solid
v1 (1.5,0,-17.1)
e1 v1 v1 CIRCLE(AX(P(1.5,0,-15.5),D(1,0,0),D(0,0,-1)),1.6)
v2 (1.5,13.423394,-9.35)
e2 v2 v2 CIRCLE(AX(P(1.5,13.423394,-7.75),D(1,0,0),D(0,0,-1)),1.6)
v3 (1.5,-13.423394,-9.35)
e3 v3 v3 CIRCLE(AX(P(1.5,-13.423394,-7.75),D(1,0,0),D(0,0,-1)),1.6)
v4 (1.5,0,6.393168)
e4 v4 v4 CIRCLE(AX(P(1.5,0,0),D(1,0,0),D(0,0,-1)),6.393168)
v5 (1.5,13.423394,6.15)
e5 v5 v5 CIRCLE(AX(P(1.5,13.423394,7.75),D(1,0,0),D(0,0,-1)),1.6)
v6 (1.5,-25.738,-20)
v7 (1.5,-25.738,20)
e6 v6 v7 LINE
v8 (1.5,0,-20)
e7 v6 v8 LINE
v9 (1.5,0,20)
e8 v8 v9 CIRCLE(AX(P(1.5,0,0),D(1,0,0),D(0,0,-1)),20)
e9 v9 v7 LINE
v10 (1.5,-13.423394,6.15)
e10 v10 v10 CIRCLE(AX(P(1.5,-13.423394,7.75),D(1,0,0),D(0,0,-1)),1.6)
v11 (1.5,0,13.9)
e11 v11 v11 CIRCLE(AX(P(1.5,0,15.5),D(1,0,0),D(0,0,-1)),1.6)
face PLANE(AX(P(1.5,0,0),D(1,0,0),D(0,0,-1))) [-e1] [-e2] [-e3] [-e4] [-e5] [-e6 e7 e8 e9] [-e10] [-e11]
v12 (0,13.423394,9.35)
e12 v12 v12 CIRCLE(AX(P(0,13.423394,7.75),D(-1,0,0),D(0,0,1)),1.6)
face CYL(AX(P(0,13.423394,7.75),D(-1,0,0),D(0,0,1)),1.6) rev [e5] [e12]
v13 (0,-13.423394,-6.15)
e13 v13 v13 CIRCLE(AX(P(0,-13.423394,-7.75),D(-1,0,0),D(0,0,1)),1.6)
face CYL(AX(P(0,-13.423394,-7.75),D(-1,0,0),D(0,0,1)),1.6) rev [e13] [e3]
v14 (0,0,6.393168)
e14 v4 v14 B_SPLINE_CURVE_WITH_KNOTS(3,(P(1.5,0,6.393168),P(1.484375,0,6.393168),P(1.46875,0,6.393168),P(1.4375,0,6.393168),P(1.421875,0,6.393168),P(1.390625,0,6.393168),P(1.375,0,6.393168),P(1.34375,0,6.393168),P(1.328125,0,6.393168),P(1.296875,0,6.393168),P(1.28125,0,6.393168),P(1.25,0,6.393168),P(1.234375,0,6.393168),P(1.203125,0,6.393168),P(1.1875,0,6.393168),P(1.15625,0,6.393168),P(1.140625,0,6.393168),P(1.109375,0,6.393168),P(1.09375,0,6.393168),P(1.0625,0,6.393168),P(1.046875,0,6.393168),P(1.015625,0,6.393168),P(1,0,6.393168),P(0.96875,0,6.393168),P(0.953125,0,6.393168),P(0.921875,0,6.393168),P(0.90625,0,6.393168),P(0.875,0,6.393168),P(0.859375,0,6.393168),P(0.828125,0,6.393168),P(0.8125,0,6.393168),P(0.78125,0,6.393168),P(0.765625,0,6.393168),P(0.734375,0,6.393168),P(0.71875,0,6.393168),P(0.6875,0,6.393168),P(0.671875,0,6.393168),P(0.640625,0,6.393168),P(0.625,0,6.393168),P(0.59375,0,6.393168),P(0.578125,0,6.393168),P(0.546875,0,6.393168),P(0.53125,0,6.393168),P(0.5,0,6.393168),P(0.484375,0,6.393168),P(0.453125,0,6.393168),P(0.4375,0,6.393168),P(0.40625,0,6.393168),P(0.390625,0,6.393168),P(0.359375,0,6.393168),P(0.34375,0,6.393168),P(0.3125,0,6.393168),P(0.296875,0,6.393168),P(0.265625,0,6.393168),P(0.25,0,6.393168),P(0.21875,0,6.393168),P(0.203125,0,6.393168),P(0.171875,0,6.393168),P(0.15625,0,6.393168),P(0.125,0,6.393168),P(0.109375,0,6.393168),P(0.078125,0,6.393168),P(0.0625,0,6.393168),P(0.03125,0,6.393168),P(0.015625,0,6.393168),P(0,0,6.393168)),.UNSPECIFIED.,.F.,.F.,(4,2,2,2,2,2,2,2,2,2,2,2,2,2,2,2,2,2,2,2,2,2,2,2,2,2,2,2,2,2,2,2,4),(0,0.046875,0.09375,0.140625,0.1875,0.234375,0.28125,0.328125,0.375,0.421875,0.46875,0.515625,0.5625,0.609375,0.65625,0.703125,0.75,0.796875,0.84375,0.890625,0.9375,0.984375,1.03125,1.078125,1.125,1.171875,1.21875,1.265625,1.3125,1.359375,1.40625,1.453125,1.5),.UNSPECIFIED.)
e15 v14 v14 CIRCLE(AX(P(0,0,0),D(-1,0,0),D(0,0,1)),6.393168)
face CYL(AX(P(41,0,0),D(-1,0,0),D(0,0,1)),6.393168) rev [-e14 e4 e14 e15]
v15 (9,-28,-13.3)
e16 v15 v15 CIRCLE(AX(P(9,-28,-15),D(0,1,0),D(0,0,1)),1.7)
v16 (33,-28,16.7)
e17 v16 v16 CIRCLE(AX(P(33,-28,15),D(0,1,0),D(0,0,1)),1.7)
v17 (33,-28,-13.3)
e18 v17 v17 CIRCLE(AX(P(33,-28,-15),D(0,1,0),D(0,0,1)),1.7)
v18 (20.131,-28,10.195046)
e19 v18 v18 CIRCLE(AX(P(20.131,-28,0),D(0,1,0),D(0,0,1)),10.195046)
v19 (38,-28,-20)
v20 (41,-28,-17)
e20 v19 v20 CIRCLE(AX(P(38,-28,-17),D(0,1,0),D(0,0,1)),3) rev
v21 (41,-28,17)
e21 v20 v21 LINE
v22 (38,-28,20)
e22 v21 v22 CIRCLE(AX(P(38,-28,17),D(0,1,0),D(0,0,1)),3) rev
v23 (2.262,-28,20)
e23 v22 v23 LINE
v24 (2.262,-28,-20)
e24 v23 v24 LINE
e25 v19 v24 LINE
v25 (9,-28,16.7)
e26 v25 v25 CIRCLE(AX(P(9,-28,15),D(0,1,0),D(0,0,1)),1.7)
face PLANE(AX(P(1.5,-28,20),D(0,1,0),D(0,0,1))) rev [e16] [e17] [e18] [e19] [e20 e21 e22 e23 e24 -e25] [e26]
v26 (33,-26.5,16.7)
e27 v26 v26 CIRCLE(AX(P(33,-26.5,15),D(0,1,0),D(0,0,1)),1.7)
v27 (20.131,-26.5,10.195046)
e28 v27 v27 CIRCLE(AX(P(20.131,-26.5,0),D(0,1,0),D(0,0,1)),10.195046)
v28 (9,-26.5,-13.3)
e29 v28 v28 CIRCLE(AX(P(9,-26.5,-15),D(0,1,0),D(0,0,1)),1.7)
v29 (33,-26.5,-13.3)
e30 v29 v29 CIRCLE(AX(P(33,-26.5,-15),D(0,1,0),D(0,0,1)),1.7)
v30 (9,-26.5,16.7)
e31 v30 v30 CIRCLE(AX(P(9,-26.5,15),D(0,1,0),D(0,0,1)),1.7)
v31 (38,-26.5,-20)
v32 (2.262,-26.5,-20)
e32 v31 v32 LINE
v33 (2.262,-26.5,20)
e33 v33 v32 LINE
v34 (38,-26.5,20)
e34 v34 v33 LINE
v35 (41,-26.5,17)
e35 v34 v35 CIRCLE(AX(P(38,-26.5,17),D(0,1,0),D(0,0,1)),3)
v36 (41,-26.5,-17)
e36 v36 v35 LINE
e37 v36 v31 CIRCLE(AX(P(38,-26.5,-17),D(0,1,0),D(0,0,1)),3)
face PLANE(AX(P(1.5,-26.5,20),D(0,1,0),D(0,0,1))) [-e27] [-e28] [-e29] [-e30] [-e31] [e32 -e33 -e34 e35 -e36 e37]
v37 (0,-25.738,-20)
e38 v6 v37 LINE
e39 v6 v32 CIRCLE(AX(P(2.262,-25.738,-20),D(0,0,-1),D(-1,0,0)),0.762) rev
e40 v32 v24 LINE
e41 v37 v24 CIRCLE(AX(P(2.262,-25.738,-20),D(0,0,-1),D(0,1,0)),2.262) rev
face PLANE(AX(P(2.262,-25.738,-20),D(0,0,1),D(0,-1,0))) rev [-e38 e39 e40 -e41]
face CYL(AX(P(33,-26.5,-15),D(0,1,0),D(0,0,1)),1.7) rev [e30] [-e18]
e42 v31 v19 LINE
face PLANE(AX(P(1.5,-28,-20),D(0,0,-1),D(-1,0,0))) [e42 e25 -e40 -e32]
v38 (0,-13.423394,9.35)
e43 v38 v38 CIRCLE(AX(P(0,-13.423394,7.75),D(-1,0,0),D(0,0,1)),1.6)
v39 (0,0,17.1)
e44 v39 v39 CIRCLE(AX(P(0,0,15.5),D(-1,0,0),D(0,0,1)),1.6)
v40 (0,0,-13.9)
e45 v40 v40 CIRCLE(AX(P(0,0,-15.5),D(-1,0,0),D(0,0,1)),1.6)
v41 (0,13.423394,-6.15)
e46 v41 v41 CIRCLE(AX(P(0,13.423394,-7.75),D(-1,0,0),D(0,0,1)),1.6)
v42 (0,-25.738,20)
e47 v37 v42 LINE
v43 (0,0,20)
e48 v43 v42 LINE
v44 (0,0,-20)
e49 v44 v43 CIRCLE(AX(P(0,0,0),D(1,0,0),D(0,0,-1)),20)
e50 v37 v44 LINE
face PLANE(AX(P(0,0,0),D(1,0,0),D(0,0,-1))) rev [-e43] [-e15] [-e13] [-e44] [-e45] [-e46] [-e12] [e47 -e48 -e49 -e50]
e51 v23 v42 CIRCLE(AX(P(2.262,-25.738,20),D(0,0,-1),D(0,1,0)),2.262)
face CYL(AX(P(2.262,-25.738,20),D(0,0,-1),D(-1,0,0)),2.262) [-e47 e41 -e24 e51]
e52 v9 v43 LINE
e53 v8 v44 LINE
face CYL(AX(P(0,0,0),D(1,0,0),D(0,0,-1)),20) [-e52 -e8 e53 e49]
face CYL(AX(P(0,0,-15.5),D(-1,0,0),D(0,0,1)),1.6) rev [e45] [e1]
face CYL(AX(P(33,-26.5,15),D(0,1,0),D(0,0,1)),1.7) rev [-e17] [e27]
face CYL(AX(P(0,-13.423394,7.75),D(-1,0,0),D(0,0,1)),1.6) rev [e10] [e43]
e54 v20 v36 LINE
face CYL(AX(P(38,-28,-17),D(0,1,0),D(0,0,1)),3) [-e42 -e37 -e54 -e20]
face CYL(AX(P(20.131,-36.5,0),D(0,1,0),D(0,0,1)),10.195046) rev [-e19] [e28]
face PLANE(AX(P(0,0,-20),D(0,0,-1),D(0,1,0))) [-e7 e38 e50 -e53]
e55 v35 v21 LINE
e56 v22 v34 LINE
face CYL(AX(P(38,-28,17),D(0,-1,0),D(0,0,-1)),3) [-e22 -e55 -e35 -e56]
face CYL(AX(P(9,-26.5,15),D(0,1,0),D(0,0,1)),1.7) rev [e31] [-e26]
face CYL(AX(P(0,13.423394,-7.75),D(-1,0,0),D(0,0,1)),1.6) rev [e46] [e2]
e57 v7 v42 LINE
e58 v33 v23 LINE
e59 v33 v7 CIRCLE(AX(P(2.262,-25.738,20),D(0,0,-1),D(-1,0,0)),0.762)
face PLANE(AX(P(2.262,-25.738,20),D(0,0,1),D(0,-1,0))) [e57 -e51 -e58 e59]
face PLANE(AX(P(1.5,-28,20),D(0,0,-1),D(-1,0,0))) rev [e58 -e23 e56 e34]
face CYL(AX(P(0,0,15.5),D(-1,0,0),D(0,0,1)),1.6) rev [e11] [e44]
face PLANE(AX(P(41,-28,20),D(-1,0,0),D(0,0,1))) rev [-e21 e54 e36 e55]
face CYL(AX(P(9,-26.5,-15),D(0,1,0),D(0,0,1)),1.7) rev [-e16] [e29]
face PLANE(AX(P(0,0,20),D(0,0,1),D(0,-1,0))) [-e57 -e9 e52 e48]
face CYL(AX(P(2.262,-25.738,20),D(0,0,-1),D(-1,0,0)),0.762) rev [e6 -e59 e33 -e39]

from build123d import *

# Parameters (mm, degrees)
BOSS_EXTRUDE1_DEPTH    = 1.5
SKETCH2_W              = 41
SKETCH2_H              = 40
BOSS_EXTRUDE2_DEPTH    = 1.5
CONVERT_SOLID1_START   = -20
CONVERT_SOLID1_DEPTH   = 40
CONVERT_SOLID1_2_DEPTH = 40
M3_CLEARANCE_HOLE1_D   = 3.2
CIRPATTERN1_COUNT      = 6
SKETCH9_R              = 6.393167934
CUT_EXTRUDE1_DEPTH     = 54.525694764
M3_CLEARANCE_HOLE2_D   = 3.4
LPATTERN1_COUNT        = 2
LPATTERN1_PITCH        = 24
LPATTERN1_COPY_1_D     = 3.4
FILLET1_R              = 3
SKETCH12_R             = 10.195045523
CUT_EXTRUDE2_DEPTH     = 10


# Read off the part's stored shape, not the designer's step: Convert-Solid1
with BuildPart() as part:
    # Sketch1 → Boss-Extrude1 (new body)
    with BuildSketch(Plane(origin=(0, 0, 0), x_dir=(0, 0, -1), z_dir=(1, 0, 0))):
        with BuildLine():
            Line((-20, 0), (-20, -28))
            Line((-20, -28), (20, -28))
            Line((20, -28), (20, 0))
            ThreePointArc((20, 0), (0, 20), (-20, 0))
        make_face()
    extrude(amount=BOSS_EXTRUDE1_DEPTH)

    # Sketch2 → Boss-Extrude2 (add)
    with BuildSketch(Plane.XZ.offset(28)):
        with Locations((20.5, 0)):
            Rectangle(SKETCH2_W, SKETCH2_H)
    extrude(amount=-BOSS_EXTRUDE2_DEPTH)

    # Convert-Solid1 outline → Convert-Solid1 (cut)
    with BuildSketch(Plane.XY.offset(CONVERT_SOLID1_START)):
        with BuildLine():
            Line((0, -28), (2.262, -28))
            ThreePointArc((2.262, -28), (0.662524461, -27.337475539), (0, -25.738))
            Line((0, -25.738), (0, -28))
        make_face()
    extrude(amount=CONVERT_SOLID1_DEPTH, mode=Mode.SUBTRACT)

    # Convert-Solid1 2 outline → Convert-Solid1 2 (add)
    with BuildSketch(Plane.XY.offset(CONVERT_SOLID1_START)):
        with BuildLine():
            Line((1.5, -26.5), (2.262, -26.5))
            ThreePointArc((2.262, -26.5), (1.723184633, -26.276815367), (1.5, -25.738))
            Line((1.5, -25.738), (1.5, -26.5))
        make_face()
    extrude(amount=CONVERT_SOLID1_2_DEPTH)

    # M3 Clearance Hole1 (through all)
    with Locations(Plane.ZY):
        with Locations((-15.5, 0)):
            m3_clearance_hole1 = Hole(M3_CLEARANCE_HOLE1_D / 2)

    # CirPattern1: M3 Clearance Hole1 ×6 about axis
    cirpattern1_axis = Axis((0, 0, 0), (1, 0, 0))
    for i in range(1, CIRPATTERN1_COUNT):
        add(m3_clearance_hole1.rotate(cirpattern1_axis, i * 360 / CIRPATTERN1_COUNT), mode=Mode.SUBTRACT)

    # Sketch9 → Cut-Extrude1 (cut, through all)
    with BuildSketch(Plane.ZY):
        Circle(SKETCH9_R)
    extrude(amount=-CUT_EXTRUDE1_DEPTH, mode=Mode.SUBTRACT)

    # M3 Clearance Hole2 (through all)
    with Locations(Plane(origin=(0, -26.5, 0), x_dir=(1, 0, 0), z_dir=(0, 1, 0))):
        with Locations((33, 15)):
            m3_clearance_hole2 = Hole(M3_CLEARANCE_HOLE2_D / 2)

    # Mirror1: M3 Clearance Hole2 across plane
    add(m3_clearance_hole2.mirror(Plane.XY), mode=Mode.SUBTRACT)

    # LPattern1: M3 Clearance Hole2 ×2
    with Locations(*[(-i * LPATTERN1_PITCH, 0, 0) for i in range(1, LPATTERN1_COUNT)]):
        add(m3_clearance_hole2, mode=Mode.SUBTRACT)

    # LPattern1 copy 1 (through all)
    with Locations(Plane(origin=(-24, -26.5, 0), x_dir=(1, 0, 0), z_dir=(0, 1, 0))):
        with Locations((33, -15)):
            Hole(LPATTERN1_COPY_1_D / 2)

    # Fillet1
    fillet1_edges = [part.edges().sort_by_distance(p)[0] for p in [
        (41, -27.25, 20),
        (41, -27.25, -20),
    ]]
    fillet(fillet1_edges, radius=FILLET1_R)

    # Sketch12 → Cut-Extrude2 (cut)
    with BuildSketch(Plane(origin=(0, -26.5, 0), x_dir=(1, 0, 0), z_dir=(0, 1, 0))):
        with Locations(Location((20.131, 0, 0), (0, 0, 270))):
            Circle(SKETCH12_R)
    extrude(amount=-CUT_EXTRUDE2_DEPTH, mode=Mode.SUBTRACT)


solid = part.part
